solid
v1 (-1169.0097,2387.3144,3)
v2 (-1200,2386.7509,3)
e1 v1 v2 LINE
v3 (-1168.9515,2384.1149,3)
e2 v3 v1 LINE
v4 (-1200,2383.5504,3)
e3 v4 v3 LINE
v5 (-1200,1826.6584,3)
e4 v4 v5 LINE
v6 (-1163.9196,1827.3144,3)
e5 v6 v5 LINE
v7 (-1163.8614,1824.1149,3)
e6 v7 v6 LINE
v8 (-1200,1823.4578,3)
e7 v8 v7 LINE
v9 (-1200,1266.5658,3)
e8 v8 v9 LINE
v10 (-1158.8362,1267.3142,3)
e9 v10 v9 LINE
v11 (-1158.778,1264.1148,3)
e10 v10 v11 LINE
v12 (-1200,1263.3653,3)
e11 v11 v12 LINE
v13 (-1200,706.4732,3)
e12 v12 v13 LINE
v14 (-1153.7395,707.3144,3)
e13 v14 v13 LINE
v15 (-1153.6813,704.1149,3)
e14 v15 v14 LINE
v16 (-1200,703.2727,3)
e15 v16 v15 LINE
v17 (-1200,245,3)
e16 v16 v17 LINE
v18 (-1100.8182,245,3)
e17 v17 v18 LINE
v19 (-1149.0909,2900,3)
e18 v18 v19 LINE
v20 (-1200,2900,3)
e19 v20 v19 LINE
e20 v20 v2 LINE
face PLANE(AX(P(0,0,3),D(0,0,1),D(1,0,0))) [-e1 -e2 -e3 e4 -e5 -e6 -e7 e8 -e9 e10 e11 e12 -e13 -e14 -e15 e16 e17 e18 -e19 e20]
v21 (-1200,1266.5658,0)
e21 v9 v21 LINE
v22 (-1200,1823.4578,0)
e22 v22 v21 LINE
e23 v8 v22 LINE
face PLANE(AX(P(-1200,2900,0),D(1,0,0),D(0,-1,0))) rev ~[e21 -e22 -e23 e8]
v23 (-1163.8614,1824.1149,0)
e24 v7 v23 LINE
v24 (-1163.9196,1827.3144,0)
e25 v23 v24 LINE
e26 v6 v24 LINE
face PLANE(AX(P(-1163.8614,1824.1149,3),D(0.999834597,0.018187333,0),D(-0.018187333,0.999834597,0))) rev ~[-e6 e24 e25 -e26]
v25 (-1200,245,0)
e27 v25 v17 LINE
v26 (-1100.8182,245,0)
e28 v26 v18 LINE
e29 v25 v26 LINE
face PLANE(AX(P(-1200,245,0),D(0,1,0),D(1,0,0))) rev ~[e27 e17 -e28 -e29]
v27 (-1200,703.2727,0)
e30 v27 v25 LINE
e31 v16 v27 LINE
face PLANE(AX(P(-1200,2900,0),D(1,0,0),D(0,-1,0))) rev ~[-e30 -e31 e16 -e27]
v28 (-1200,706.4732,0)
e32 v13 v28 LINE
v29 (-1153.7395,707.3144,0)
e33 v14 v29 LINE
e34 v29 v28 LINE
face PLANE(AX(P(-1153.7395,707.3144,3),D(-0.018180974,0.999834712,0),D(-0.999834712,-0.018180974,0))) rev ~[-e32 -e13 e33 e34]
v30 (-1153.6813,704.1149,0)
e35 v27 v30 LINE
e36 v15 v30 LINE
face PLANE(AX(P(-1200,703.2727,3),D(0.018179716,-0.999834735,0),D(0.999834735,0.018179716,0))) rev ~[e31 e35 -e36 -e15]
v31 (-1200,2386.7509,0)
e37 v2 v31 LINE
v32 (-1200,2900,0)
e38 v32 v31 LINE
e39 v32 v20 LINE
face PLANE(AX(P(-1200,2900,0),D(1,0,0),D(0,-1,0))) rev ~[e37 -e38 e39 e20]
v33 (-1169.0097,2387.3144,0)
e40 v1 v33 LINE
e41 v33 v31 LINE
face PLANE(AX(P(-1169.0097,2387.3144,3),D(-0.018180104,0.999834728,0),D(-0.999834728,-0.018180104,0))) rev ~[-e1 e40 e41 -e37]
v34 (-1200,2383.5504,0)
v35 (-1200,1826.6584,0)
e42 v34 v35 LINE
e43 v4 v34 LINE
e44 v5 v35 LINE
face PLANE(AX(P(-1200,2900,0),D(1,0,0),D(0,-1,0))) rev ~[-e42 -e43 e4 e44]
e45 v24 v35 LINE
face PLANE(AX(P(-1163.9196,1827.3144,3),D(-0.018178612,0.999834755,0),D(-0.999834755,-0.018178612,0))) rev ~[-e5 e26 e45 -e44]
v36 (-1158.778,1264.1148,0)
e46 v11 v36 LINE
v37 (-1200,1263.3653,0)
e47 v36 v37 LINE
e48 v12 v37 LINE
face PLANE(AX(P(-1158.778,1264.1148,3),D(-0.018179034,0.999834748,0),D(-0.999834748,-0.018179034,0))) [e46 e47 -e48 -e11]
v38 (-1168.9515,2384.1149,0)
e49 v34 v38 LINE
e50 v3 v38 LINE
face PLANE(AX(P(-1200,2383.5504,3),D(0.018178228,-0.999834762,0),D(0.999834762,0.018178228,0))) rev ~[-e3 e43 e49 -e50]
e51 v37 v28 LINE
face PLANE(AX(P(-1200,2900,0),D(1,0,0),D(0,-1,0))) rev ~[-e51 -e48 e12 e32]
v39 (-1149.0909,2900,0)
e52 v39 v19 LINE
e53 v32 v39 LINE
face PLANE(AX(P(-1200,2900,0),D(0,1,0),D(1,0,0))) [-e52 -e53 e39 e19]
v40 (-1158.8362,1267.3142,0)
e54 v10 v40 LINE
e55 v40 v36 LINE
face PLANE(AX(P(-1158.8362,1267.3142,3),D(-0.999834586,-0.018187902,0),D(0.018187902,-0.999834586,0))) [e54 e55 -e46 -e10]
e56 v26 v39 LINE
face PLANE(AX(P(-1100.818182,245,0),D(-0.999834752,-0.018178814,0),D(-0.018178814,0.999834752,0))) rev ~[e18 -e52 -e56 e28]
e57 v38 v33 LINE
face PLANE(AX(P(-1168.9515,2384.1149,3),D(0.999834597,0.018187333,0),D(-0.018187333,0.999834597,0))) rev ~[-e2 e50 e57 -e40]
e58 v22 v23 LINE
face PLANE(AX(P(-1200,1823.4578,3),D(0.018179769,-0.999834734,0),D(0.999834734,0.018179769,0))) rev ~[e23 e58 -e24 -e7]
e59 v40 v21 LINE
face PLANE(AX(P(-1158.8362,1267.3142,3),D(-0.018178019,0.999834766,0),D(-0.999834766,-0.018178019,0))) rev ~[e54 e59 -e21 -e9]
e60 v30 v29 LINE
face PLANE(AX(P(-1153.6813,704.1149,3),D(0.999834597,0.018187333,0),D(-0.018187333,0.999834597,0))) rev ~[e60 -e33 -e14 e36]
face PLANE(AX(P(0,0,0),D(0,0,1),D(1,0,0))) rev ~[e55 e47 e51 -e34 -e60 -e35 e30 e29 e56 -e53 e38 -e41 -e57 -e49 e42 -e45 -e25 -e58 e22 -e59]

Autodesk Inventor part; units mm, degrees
ref_plane "YZ Plane" through (0, 0, 0) normal (1, 0, 0) x (0, 1, 0)
ref_plane "XZ Plane" through (0, 0, 0) normal (0, 1, 0) x (-1, 0, 0)
ref_plane "XY Plane" through (0, 0, 0) normal (0, 0, 1) x (1, 0, 0)
sketch "Sketch1" plane through (0, 0, 0) normal (0, 0, 1) x (1, 0, 0)
  line L0 (1200, 2950) -> (-1200, 2950)
  line L1 (-1200, 2950) -> (-1200, 0)
  line L2 (-1200, 0) -> (1200, 0)
  line L3 (1200, 0) -> (1200, 2950)
  line L4 (1150, 2950) -> (1150, 0)
  line L5 (-1150, 0) -> (-1150, 2950) construction
  line L6 (0, 2950) -> (0, 50) construction
  line L7 (-1100, 200) -> (-950, 50)
  line L8 (-1200, 100) -> (-1100, 100)
  line L9 (-1100, 100) -> (-1100, 0)
  line L10 (-1100, 200) -> (-1150, 2950)
  arc A0 (-1100.4545, 224.9959) -> (-1082.3223, 182.3223) centre (-1100, 200) ccw
  arc A1 (-1082.3223, 182.3223) -> (-1100.4545, 224.9959) centre (-1100, 200) ccw construction
  line L11 (-1200, 255) -> (-1101, 255) construction
  line L12 (0, 50) -> (-950, 50)
  line L13 (0, 50) -> (0, 0)
  line L14 (1505.3449, -225.894) -> (355.3449, -225.894)
  line L15 (-1200, 245) -> (-1100.8182, 245)
  line L16 (-1200, 2900) -> (-1149.0909, 2900)
  dimension "d3" = 2400
  dimension "d4" = 2950
  dimension "d5" = 50
  dimension "d6" = 100
  dimension "d7" = 50
  dimension "d9" = 135
  dimension "d10" = 950
  dimension "d11" = 1150
  dimension "d12" = 136.042
  dimension "d13" = 50
  dimension "d14" = 100
  dimension "d15" = 212.132
  dimension "d17" = 55
  dimension "d20" = 200
  dimension "d50" = 2705
  dimension "d53" = 50
extrude "Plate1" add sketch "Sketch1" along normal blind 3 contours L10 L15 L1 L16
sketch "Sketch2" plane through (0, 0, 3) normal (0, 0, 1) x (1, 0, 0)
  line L0 (-1149.0909, 2900) -> (-1100.8182, 245) projected
  line L1 (-1200, 245) -> (-1200, 2900) projected
  line L2 (-1100.8182, 245) -> (-1150, 2950) projected
  line L3 (-1158.8362, 1267.3142) -> (-1158.778, 1264.1148)
  line L4 (-1158.778, 1264.1148) -> (-1119.3606, 1264.8314) construction
  line L5 (-1150, 2950) -> (-1100.8182, 245) projected
  line L6 (-1158.778, 1264.1148) -> (-1200, 1263.3653)
  line L7 (-1158.8362, 1267.3142) -> (-1200, 1266.5658)
  line L8 (-1200, 703.2727) -> (-1153.6813, 704.1149)
  line L9 (-1153.6813, 704.1149) -> (-1153.7395, 707.3144)
  line L10 (-1153.6813, 704.1149) -> (-1109.1804, 704.924) construction
  line L11 (-1153.7395, 707.3144) -> (-1200, 706.4732)
  line L12 (-1200, 1823.4578) -> (-1163.8614, 1824.1149)
  line L13 (-1163.8614, 1824.1149) -> (-1163.9196, 1827.3144)
  line L14 (-1163.9196, 1827.3144) -> (-1200, 1826.6584)
  line L15 (-1163.8614, 1824.1149) -> (-1129.5407, 1824.7389) construction
  line L16 (-1200, 2383.5504) -> (-1168.9515, 2384.1149)
  line L17 (-1168.9515, 2384.1149) -> (-1169.0097, 2387.3144)
  line L18 (-1168.9515, 2384.1149) -> (-1139.7208, 2384.6464) construction
  line L19 (-1169.0097, 2387.3144) -> (-1200, 2386.7509)
  line L20 (-1100.8182, 245) -> (-1200, 245) projected
  line L21 (-1200, 2900) -> (-1149.0909, 2900) projected
  point P0 (0, 0)
  dimension "d34" = 46.3264
  dimension "d36" = 41.2288
  dimension "d39" = 36.1445
  dimension "d42" = 31.0536
  dimension "d43" = 560
  dimension "d44" = 3.2
  dimension "d45" = 560
  dimension "d46" = 3.2
  dimension "d47" = 560
  dimension "d48" = 3.2
  dimension "d49" = 3.2
  dimension "d52" = 460
extrude "Extrusion1" cut sketch "Sketch2" against normal through all contours L19 L17 L16 L1 | L1 L11 L9 L8 | L14 L13 L12 L1 | L1 L7 L3 L6
sketch "Sketch3" plane through (0, 0, 0) normal (0, 0, -1) x (-1, 0, 0)
  line L0 (1163.9196, 1827.3144) -> (1200, 1826.6584) construction
  line L1 (1200, 2383.5504) -> (1200, 1826.6584) construction
  line L2 (1200, 2383.5504) -> (1168.9515, 2384.1149) construction
  line L3 (1168.9515, 2384.1149) -> (1169.0097, 2387.3144) construction
  line L4 (1169.0097, 2387.3144) -> (1200, 2386.7509) construction
  line L5 (1200, 2900) -> (1200, 2386.7509) construction
  line L6 (1149.0909, 2900) -> (1200, 2900) construction
  line L7 (1100.8182, 245) -> (1149.0909, 2900) construction
  line L8 (1200, 245) -> (1100.8182, 245) construction
  line L9 (1200, 703.2727) -> (1200, 245) construction
  line L10 (1200, 703.2727) -> (1153.6813, 704.1149) construction
  line L11 (1153.6813, 704.1149) -> (1153.7395, 707.3144) construction
  line L12 (1153.7395, 707.3144) -> (1200, 706.4732) construction
  line L13 (1200, 1263.3653) -> (1200, 706.4732) construction
  line L14 (1200, 1263.3653) -> (1158.778, 1264.1148) construction
  line L15 (1158.778, 1264.1148) -> (1158.8362, 1267.3142) construction
  line L16 (1158.8362, 1267.3142) -> (1200, 1266.5658) construction
  line L17 (1200, 1823.4578) -> (1200, 1266.5658) construction
  line L18 (1200, 1823.4578) -> (1163.8614, 1824.1149) construction
  line L19 (1163.8614, 1824.1149) -> (1163.9196, 1827.3144) construction
  line L20 (1126.2104, 259.6097) -> (1164.6622, 259.6097) construction
  line L21 (1164.6622, 259.6097) -> (1164.6622, 256.036) construction
  line L22 (1164.6622, 256.036) -> (1126.2104, 256.036) construction
  line L23 (1126.2104, 256.036) -> (1126.2104, 259.6097) construction
  point P0 (0, 0)
mark "Mark1"
equation "\"d11\" = d10 + d18"
equation "\"d14\" = d6"
equation "\"d43\" = Stringer1_step"
equation "\"d45\" = Stringer1_step"
equation "\"d47\" = Stringer1_step"
equation "\"d52\" = Stringer1_hight"
equation "\"d2\" = Thickness"
equation "\"BendReliefWidth\" = Thickness"
equation "\"BendReliefDepth\" = 0.5 * Thickness"
equation "\"CornerReliefSize\" = 4 * Thickness"
equation "\"MinimumRemnant\" = 2 * Thickness"
equation "\"TransitionRadius\" = BendRadius"
equation "\"JacobiRadiusSize\" = BendRadius"
equation "\"GapSize\" = Thickness"
equation "\"d18\" = d19"
equation "\"Stringer1_step\" = 560"
equation "\"Stringer1_hight\" = 460"
equation "\"Thickness\" = 3"
equation "\"BendRadius\" = 5"
equation "\"d19\" = 200"
properties part number "BSH 022 rib board" material "09g2s"
